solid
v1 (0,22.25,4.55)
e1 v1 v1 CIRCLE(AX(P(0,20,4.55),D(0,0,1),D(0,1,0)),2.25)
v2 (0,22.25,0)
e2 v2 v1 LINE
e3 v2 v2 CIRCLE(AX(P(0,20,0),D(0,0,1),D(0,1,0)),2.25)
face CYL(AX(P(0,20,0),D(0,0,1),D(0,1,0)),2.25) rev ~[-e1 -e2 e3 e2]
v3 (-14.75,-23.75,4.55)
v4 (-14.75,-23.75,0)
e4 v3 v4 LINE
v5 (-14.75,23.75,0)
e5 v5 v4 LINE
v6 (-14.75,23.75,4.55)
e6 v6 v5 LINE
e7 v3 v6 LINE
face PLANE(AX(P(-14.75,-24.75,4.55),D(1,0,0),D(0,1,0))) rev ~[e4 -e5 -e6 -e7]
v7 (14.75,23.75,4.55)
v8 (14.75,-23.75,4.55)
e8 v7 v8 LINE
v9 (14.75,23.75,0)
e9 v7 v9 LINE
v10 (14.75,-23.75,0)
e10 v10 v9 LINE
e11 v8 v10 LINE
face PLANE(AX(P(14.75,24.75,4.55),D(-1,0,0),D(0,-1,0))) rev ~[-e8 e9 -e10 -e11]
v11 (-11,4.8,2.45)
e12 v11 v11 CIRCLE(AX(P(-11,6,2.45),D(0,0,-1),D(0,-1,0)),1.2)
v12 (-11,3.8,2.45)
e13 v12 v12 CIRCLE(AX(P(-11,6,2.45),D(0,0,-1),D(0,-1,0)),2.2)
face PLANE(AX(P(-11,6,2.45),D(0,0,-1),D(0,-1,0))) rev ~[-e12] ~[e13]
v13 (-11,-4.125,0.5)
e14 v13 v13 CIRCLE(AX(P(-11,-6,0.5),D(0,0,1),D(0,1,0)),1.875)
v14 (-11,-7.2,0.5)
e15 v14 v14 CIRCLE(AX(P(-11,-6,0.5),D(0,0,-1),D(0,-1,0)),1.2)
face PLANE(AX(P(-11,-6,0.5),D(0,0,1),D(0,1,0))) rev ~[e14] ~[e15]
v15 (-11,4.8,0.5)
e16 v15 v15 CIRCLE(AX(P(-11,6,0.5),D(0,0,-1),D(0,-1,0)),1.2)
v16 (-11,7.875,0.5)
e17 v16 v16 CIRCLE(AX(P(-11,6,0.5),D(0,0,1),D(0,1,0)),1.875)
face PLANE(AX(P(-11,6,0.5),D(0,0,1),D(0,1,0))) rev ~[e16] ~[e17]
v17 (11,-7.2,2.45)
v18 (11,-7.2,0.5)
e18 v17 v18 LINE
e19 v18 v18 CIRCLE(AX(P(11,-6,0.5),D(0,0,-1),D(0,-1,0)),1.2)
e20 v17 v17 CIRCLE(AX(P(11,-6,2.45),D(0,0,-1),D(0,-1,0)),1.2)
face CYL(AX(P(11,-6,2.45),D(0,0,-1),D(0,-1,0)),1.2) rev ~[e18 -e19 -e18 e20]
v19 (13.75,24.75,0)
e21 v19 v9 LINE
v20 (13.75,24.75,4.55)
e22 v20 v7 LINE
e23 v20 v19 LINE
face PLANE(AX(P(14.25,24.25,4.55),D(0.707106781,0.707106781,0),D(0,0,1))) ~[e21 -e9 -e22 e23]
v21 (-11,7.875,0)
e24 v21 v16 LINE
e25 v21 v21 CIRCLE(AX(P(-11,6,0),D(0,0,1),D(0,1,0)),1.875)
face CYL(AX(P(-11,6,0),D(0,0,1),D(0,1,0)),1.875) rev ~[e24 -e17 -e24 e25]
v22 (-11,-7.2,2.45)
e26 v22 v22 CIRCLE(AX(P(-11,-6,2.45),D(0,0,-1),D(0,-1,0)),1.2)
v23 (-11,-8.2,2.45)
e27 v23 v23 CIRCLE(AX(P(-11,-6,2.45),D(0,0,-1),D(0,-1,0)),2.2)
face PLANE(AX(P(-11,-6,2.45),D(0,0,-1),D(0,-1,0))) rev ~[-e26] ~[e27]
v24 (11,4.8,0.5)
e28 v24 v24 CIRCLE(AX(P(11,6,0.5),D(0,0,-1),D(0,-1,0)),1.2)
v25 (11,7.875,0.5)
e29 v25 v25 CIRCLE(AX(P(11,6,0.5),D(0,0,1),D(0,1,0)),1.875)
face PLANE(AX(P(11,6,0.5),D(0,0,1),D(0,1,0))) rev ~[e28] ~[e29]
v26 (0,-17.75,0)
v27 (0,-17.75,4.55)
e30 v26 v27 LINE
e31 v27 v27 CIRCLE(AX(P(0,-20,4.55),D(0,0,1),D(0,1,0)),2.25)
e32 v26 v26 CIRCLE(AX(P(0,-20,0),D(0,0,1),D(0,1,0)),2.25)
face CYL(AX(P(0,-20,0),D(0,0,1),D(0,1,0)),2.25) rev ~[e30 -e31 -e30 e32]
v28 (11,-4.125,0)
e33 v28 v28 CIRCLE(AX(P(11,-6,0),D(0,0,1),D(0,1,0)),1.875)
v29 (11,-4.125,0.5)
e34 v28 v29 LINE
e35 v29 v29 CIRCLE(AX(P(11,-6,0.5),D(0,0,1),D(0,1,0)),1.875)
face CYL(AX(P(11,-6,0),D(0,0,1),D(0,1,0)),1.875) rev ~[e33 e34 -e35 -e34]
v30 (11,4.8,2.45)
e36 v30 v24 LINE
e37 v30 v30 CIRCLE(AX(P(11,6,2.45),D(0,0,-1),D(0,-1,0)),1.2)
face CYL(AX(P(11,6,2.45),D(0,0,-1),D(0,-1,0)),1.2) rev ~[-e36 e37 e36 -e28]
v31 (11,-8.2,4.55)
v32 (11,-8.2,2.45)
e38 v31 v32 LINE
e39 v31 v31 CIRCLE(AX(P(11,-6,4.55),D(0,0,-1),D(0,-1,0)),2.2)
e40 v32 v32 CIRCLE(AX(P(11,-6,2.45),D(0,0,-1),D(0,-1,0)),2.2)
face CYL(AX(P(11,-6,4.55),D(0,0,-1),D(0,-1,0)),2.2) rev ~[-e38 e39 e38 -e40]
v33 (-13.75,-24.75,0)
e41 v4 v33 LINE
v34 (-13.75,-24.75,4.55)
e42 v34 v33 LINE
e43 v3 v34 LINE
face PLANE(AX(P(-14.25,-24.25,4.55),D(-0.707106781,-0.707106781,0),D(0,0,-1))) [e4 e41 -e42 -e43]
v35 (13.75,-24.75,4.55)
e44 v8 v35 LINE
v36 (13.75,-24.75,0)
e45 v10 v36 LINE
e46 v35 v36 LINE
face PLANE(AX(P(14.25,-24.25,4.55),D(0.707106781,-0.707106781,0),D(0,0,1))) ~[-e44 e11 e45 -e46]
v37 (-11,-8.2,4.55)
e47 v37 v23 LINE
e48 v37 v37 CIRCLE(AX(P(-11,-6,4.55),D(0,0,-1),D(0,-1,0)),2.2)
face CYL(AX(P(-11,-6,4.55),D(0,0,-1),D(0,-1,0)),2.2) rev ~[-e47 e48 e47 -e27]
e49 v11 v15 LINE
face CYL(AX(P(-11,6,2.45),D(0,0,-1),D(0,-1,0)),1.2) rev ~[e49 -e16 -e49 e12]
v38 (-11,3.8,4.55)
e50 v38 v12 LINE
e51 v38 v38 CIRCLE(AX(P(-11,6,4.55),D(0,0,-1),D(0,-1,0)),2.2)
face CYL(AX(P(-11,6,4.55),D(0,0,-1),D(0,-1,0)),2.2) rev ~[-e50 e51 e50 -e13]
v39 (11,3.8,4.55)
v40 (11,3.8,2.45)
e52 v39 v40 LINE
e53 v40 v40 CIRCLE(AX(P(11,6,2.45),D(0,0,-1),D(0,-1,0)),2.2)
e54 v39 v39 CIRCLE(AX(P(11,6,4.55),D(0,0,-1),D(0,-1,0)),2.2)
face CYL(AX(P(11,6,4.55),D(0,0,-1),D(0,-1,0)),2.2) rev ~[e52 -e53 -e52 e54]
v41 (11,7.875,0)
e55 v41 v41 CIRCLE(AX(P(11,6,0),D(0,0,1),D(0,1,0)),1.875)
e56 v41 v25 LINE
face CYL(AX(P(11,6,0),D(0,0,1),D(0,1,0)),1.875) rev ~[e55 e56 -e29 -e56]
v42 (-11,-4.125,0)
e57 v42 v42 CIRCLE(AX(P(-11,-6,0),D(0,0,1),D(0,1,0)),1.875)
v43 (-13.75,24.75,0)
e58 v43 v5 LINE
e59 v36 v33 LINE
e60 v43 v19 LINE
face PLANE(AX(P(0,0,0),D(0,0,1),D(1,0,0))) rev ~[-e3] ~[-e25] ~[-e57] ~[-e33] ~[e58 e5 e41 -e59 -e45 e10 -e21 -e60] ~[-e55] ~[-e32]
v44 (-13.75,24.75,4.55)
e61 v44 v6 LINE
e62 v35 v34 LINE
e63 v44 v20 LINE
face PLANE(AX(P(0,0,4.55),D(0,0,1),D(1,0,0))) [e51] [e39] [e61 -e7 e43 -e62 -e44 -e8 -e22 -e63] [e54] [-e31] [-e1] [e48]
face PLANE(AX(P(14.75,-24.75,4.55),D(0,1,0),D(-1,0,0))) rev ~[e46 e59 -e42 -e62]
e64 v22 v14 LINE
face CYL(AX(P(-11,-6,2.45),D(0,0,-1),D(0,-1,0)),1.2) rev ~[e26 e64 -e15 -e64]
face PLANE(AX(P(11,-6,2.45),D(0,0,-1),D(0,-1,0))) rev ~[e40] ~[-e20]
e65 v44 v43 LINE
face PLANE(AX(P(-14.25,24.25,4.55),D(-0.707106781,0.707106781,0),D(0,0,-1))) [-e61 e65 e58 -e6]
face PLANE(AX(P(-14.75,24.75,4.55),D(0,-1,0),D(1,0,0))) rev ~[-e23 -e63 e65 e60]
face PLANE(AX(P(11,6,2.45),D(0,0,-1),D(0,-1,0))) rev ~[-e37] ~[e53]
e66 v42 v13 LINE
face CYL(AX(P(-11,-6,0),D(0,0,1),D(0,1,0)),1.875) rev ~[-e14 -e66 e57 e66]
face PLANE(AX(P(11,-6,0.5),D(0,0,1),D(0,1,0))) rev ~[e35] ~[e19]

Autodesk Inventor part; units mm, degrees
ref_plane "YZ Plane" through (0, 0, 0) normal (1, 0, 0) x (0, 1, 0)
ref_plane "XZ Plane" through (0, 0, 0) normal (0, 1, 0) x (-1, 0, 0)
ref_plane "XY Plane" through (0, 0, 0) normal (0, 0, 1) x (1, 0, 0)
sketch "Sketch1" plane through (0, 0, 0) normal (0, 0, 1) x (1, 0, 0)
  line L0 (-14.75, -15.25) -> (14.75, -15.25)
  line L1 (14.75, -15.25) -> (14.75, 15.25)
  line L2 (14.75, 15.25) -> (-14.75, 15.25)
  line L3 (-14.75, 15.25) -> (-14.75, -15.25)
  line L4 (-14.75, -15.25) -> (14.75, 15.25) construction
  line L5 (14.75, -15.25) -> (-14.75, 15.25) construction
  point P0 (0, 0)
  dimension "WIDTH" = 29.5
  dimension "LENGTH" = 30.5
extrude "Extrusion1" add sketch "Sketch1" along normal blind 4.55
sketch "Sketch4" plane through (0, 0, 4.55) normal (0, 0, 1) x (1, 0, 0)
  line L0 (-14.75, 24.75) -> (14.75, 24.75)
  line L1 (14.75, 24.75) -> (14.75, -24.75)
  line L2 (14.75, -24.75) -> (-14.75, -24.75)
  line L3 (-14.75, -24.75) -> (-14.75, 24.75)
  line L4 (-14.75, 24.75) -> (14.75, -24.75) construction
  line L5 (14.75, 24.75) -> (-14.75, -24.75) construction
  point P0 (0, 0)
  dimension "LENGTH_WHOLE" = 49.5
  dimension "d30" = 29.5
extrude "Extrusion2" add sketch "Sketch4" against normal blind 4.55
sketch "Sketch2" plane through (0, 0, 4.55) normal (0, 0, 1) x (1, 0, 0)
  point P0 (0, 0)
  point P1 (-11, 6)
  point P2 (11, 6)
  point P3 (-11, -6)
  point P4 (11, -6)
  dimension "d11" = 22
  dimension "d12" = 0
  dimension "d13" = 0
  dimension "d14" = 0
  dimension "d15" = 0
  dimension "d16" = 12
  dimension "d17" = 6
  dimension "d18" = 11
hole "Hole1" at (-11, 6, 4.55) at (11, 6, 4.55) at (-11, -6, 4.55) at (11, -6, 4.55) direction (0, 0, -1) diameter 2.4 end through all counterbore diameter 4.4 counterbore depth 2.1 clearance for "Socket Head Cap Screw" size "M2" standard "Ansi Metric M Profile"
sketch "Sketch5" plane through (0, 0, 0) normal (0, 0, -1) x (-1, 0, 0)
  point P0 (0, 0)
  point P1 (0, 20)
  point P2 (0, -20)
  dimension "d40" = 0
  dimension "d41" = 0
  dimension "d42" = 20
  dimension "d43" = 40
hole "Hole3" at (0, 20, 0) at (0, -20, 0) direction (0, 0, 1) diameter 4.5 end through all clearance for "Socket Head Cap Screw" size "#8" standard "Ansi Unified Screw Threads"
sketch "Sketch9" plane through (0, 0, 0) normal (0, 0, -1) x (-1, 0, 0)
  circle A0 centre (11, 6) radius 1.2 projected
  point P0 (0, 0)
  point P1 (11, -6)
  point P2 (-11, 6)
  point P3 (-11, -6)
  dimension "d79" = 0
  dimension "d80" = 0
  dimension "d81" = 0
  dimension "d82" = 12
  dimension "d83" = 0
  dimension "d84" = 22
  dimension "d85" = 0
  dimension "d86" = 0
hole "Hole6" at (-11, 6, 0) at (-11, -6, 0) at (11, 6, 0) at (11, -6, 0) direction (0, 0, 1) diameter 3.75 depth 0.5
chamfer "Chamfer3" distance 1 angle 45 4 edges at (14.75, -24.75, 2.275) (-14.75, -24.75, 2.275) (-14.75, 24.75, 2.275) (14.75, 24.75, 2.275)
equation "\"d30\" = WIDTH"
equation "\"d43\" = 2 * d42"
properties part number "camera_mount"
